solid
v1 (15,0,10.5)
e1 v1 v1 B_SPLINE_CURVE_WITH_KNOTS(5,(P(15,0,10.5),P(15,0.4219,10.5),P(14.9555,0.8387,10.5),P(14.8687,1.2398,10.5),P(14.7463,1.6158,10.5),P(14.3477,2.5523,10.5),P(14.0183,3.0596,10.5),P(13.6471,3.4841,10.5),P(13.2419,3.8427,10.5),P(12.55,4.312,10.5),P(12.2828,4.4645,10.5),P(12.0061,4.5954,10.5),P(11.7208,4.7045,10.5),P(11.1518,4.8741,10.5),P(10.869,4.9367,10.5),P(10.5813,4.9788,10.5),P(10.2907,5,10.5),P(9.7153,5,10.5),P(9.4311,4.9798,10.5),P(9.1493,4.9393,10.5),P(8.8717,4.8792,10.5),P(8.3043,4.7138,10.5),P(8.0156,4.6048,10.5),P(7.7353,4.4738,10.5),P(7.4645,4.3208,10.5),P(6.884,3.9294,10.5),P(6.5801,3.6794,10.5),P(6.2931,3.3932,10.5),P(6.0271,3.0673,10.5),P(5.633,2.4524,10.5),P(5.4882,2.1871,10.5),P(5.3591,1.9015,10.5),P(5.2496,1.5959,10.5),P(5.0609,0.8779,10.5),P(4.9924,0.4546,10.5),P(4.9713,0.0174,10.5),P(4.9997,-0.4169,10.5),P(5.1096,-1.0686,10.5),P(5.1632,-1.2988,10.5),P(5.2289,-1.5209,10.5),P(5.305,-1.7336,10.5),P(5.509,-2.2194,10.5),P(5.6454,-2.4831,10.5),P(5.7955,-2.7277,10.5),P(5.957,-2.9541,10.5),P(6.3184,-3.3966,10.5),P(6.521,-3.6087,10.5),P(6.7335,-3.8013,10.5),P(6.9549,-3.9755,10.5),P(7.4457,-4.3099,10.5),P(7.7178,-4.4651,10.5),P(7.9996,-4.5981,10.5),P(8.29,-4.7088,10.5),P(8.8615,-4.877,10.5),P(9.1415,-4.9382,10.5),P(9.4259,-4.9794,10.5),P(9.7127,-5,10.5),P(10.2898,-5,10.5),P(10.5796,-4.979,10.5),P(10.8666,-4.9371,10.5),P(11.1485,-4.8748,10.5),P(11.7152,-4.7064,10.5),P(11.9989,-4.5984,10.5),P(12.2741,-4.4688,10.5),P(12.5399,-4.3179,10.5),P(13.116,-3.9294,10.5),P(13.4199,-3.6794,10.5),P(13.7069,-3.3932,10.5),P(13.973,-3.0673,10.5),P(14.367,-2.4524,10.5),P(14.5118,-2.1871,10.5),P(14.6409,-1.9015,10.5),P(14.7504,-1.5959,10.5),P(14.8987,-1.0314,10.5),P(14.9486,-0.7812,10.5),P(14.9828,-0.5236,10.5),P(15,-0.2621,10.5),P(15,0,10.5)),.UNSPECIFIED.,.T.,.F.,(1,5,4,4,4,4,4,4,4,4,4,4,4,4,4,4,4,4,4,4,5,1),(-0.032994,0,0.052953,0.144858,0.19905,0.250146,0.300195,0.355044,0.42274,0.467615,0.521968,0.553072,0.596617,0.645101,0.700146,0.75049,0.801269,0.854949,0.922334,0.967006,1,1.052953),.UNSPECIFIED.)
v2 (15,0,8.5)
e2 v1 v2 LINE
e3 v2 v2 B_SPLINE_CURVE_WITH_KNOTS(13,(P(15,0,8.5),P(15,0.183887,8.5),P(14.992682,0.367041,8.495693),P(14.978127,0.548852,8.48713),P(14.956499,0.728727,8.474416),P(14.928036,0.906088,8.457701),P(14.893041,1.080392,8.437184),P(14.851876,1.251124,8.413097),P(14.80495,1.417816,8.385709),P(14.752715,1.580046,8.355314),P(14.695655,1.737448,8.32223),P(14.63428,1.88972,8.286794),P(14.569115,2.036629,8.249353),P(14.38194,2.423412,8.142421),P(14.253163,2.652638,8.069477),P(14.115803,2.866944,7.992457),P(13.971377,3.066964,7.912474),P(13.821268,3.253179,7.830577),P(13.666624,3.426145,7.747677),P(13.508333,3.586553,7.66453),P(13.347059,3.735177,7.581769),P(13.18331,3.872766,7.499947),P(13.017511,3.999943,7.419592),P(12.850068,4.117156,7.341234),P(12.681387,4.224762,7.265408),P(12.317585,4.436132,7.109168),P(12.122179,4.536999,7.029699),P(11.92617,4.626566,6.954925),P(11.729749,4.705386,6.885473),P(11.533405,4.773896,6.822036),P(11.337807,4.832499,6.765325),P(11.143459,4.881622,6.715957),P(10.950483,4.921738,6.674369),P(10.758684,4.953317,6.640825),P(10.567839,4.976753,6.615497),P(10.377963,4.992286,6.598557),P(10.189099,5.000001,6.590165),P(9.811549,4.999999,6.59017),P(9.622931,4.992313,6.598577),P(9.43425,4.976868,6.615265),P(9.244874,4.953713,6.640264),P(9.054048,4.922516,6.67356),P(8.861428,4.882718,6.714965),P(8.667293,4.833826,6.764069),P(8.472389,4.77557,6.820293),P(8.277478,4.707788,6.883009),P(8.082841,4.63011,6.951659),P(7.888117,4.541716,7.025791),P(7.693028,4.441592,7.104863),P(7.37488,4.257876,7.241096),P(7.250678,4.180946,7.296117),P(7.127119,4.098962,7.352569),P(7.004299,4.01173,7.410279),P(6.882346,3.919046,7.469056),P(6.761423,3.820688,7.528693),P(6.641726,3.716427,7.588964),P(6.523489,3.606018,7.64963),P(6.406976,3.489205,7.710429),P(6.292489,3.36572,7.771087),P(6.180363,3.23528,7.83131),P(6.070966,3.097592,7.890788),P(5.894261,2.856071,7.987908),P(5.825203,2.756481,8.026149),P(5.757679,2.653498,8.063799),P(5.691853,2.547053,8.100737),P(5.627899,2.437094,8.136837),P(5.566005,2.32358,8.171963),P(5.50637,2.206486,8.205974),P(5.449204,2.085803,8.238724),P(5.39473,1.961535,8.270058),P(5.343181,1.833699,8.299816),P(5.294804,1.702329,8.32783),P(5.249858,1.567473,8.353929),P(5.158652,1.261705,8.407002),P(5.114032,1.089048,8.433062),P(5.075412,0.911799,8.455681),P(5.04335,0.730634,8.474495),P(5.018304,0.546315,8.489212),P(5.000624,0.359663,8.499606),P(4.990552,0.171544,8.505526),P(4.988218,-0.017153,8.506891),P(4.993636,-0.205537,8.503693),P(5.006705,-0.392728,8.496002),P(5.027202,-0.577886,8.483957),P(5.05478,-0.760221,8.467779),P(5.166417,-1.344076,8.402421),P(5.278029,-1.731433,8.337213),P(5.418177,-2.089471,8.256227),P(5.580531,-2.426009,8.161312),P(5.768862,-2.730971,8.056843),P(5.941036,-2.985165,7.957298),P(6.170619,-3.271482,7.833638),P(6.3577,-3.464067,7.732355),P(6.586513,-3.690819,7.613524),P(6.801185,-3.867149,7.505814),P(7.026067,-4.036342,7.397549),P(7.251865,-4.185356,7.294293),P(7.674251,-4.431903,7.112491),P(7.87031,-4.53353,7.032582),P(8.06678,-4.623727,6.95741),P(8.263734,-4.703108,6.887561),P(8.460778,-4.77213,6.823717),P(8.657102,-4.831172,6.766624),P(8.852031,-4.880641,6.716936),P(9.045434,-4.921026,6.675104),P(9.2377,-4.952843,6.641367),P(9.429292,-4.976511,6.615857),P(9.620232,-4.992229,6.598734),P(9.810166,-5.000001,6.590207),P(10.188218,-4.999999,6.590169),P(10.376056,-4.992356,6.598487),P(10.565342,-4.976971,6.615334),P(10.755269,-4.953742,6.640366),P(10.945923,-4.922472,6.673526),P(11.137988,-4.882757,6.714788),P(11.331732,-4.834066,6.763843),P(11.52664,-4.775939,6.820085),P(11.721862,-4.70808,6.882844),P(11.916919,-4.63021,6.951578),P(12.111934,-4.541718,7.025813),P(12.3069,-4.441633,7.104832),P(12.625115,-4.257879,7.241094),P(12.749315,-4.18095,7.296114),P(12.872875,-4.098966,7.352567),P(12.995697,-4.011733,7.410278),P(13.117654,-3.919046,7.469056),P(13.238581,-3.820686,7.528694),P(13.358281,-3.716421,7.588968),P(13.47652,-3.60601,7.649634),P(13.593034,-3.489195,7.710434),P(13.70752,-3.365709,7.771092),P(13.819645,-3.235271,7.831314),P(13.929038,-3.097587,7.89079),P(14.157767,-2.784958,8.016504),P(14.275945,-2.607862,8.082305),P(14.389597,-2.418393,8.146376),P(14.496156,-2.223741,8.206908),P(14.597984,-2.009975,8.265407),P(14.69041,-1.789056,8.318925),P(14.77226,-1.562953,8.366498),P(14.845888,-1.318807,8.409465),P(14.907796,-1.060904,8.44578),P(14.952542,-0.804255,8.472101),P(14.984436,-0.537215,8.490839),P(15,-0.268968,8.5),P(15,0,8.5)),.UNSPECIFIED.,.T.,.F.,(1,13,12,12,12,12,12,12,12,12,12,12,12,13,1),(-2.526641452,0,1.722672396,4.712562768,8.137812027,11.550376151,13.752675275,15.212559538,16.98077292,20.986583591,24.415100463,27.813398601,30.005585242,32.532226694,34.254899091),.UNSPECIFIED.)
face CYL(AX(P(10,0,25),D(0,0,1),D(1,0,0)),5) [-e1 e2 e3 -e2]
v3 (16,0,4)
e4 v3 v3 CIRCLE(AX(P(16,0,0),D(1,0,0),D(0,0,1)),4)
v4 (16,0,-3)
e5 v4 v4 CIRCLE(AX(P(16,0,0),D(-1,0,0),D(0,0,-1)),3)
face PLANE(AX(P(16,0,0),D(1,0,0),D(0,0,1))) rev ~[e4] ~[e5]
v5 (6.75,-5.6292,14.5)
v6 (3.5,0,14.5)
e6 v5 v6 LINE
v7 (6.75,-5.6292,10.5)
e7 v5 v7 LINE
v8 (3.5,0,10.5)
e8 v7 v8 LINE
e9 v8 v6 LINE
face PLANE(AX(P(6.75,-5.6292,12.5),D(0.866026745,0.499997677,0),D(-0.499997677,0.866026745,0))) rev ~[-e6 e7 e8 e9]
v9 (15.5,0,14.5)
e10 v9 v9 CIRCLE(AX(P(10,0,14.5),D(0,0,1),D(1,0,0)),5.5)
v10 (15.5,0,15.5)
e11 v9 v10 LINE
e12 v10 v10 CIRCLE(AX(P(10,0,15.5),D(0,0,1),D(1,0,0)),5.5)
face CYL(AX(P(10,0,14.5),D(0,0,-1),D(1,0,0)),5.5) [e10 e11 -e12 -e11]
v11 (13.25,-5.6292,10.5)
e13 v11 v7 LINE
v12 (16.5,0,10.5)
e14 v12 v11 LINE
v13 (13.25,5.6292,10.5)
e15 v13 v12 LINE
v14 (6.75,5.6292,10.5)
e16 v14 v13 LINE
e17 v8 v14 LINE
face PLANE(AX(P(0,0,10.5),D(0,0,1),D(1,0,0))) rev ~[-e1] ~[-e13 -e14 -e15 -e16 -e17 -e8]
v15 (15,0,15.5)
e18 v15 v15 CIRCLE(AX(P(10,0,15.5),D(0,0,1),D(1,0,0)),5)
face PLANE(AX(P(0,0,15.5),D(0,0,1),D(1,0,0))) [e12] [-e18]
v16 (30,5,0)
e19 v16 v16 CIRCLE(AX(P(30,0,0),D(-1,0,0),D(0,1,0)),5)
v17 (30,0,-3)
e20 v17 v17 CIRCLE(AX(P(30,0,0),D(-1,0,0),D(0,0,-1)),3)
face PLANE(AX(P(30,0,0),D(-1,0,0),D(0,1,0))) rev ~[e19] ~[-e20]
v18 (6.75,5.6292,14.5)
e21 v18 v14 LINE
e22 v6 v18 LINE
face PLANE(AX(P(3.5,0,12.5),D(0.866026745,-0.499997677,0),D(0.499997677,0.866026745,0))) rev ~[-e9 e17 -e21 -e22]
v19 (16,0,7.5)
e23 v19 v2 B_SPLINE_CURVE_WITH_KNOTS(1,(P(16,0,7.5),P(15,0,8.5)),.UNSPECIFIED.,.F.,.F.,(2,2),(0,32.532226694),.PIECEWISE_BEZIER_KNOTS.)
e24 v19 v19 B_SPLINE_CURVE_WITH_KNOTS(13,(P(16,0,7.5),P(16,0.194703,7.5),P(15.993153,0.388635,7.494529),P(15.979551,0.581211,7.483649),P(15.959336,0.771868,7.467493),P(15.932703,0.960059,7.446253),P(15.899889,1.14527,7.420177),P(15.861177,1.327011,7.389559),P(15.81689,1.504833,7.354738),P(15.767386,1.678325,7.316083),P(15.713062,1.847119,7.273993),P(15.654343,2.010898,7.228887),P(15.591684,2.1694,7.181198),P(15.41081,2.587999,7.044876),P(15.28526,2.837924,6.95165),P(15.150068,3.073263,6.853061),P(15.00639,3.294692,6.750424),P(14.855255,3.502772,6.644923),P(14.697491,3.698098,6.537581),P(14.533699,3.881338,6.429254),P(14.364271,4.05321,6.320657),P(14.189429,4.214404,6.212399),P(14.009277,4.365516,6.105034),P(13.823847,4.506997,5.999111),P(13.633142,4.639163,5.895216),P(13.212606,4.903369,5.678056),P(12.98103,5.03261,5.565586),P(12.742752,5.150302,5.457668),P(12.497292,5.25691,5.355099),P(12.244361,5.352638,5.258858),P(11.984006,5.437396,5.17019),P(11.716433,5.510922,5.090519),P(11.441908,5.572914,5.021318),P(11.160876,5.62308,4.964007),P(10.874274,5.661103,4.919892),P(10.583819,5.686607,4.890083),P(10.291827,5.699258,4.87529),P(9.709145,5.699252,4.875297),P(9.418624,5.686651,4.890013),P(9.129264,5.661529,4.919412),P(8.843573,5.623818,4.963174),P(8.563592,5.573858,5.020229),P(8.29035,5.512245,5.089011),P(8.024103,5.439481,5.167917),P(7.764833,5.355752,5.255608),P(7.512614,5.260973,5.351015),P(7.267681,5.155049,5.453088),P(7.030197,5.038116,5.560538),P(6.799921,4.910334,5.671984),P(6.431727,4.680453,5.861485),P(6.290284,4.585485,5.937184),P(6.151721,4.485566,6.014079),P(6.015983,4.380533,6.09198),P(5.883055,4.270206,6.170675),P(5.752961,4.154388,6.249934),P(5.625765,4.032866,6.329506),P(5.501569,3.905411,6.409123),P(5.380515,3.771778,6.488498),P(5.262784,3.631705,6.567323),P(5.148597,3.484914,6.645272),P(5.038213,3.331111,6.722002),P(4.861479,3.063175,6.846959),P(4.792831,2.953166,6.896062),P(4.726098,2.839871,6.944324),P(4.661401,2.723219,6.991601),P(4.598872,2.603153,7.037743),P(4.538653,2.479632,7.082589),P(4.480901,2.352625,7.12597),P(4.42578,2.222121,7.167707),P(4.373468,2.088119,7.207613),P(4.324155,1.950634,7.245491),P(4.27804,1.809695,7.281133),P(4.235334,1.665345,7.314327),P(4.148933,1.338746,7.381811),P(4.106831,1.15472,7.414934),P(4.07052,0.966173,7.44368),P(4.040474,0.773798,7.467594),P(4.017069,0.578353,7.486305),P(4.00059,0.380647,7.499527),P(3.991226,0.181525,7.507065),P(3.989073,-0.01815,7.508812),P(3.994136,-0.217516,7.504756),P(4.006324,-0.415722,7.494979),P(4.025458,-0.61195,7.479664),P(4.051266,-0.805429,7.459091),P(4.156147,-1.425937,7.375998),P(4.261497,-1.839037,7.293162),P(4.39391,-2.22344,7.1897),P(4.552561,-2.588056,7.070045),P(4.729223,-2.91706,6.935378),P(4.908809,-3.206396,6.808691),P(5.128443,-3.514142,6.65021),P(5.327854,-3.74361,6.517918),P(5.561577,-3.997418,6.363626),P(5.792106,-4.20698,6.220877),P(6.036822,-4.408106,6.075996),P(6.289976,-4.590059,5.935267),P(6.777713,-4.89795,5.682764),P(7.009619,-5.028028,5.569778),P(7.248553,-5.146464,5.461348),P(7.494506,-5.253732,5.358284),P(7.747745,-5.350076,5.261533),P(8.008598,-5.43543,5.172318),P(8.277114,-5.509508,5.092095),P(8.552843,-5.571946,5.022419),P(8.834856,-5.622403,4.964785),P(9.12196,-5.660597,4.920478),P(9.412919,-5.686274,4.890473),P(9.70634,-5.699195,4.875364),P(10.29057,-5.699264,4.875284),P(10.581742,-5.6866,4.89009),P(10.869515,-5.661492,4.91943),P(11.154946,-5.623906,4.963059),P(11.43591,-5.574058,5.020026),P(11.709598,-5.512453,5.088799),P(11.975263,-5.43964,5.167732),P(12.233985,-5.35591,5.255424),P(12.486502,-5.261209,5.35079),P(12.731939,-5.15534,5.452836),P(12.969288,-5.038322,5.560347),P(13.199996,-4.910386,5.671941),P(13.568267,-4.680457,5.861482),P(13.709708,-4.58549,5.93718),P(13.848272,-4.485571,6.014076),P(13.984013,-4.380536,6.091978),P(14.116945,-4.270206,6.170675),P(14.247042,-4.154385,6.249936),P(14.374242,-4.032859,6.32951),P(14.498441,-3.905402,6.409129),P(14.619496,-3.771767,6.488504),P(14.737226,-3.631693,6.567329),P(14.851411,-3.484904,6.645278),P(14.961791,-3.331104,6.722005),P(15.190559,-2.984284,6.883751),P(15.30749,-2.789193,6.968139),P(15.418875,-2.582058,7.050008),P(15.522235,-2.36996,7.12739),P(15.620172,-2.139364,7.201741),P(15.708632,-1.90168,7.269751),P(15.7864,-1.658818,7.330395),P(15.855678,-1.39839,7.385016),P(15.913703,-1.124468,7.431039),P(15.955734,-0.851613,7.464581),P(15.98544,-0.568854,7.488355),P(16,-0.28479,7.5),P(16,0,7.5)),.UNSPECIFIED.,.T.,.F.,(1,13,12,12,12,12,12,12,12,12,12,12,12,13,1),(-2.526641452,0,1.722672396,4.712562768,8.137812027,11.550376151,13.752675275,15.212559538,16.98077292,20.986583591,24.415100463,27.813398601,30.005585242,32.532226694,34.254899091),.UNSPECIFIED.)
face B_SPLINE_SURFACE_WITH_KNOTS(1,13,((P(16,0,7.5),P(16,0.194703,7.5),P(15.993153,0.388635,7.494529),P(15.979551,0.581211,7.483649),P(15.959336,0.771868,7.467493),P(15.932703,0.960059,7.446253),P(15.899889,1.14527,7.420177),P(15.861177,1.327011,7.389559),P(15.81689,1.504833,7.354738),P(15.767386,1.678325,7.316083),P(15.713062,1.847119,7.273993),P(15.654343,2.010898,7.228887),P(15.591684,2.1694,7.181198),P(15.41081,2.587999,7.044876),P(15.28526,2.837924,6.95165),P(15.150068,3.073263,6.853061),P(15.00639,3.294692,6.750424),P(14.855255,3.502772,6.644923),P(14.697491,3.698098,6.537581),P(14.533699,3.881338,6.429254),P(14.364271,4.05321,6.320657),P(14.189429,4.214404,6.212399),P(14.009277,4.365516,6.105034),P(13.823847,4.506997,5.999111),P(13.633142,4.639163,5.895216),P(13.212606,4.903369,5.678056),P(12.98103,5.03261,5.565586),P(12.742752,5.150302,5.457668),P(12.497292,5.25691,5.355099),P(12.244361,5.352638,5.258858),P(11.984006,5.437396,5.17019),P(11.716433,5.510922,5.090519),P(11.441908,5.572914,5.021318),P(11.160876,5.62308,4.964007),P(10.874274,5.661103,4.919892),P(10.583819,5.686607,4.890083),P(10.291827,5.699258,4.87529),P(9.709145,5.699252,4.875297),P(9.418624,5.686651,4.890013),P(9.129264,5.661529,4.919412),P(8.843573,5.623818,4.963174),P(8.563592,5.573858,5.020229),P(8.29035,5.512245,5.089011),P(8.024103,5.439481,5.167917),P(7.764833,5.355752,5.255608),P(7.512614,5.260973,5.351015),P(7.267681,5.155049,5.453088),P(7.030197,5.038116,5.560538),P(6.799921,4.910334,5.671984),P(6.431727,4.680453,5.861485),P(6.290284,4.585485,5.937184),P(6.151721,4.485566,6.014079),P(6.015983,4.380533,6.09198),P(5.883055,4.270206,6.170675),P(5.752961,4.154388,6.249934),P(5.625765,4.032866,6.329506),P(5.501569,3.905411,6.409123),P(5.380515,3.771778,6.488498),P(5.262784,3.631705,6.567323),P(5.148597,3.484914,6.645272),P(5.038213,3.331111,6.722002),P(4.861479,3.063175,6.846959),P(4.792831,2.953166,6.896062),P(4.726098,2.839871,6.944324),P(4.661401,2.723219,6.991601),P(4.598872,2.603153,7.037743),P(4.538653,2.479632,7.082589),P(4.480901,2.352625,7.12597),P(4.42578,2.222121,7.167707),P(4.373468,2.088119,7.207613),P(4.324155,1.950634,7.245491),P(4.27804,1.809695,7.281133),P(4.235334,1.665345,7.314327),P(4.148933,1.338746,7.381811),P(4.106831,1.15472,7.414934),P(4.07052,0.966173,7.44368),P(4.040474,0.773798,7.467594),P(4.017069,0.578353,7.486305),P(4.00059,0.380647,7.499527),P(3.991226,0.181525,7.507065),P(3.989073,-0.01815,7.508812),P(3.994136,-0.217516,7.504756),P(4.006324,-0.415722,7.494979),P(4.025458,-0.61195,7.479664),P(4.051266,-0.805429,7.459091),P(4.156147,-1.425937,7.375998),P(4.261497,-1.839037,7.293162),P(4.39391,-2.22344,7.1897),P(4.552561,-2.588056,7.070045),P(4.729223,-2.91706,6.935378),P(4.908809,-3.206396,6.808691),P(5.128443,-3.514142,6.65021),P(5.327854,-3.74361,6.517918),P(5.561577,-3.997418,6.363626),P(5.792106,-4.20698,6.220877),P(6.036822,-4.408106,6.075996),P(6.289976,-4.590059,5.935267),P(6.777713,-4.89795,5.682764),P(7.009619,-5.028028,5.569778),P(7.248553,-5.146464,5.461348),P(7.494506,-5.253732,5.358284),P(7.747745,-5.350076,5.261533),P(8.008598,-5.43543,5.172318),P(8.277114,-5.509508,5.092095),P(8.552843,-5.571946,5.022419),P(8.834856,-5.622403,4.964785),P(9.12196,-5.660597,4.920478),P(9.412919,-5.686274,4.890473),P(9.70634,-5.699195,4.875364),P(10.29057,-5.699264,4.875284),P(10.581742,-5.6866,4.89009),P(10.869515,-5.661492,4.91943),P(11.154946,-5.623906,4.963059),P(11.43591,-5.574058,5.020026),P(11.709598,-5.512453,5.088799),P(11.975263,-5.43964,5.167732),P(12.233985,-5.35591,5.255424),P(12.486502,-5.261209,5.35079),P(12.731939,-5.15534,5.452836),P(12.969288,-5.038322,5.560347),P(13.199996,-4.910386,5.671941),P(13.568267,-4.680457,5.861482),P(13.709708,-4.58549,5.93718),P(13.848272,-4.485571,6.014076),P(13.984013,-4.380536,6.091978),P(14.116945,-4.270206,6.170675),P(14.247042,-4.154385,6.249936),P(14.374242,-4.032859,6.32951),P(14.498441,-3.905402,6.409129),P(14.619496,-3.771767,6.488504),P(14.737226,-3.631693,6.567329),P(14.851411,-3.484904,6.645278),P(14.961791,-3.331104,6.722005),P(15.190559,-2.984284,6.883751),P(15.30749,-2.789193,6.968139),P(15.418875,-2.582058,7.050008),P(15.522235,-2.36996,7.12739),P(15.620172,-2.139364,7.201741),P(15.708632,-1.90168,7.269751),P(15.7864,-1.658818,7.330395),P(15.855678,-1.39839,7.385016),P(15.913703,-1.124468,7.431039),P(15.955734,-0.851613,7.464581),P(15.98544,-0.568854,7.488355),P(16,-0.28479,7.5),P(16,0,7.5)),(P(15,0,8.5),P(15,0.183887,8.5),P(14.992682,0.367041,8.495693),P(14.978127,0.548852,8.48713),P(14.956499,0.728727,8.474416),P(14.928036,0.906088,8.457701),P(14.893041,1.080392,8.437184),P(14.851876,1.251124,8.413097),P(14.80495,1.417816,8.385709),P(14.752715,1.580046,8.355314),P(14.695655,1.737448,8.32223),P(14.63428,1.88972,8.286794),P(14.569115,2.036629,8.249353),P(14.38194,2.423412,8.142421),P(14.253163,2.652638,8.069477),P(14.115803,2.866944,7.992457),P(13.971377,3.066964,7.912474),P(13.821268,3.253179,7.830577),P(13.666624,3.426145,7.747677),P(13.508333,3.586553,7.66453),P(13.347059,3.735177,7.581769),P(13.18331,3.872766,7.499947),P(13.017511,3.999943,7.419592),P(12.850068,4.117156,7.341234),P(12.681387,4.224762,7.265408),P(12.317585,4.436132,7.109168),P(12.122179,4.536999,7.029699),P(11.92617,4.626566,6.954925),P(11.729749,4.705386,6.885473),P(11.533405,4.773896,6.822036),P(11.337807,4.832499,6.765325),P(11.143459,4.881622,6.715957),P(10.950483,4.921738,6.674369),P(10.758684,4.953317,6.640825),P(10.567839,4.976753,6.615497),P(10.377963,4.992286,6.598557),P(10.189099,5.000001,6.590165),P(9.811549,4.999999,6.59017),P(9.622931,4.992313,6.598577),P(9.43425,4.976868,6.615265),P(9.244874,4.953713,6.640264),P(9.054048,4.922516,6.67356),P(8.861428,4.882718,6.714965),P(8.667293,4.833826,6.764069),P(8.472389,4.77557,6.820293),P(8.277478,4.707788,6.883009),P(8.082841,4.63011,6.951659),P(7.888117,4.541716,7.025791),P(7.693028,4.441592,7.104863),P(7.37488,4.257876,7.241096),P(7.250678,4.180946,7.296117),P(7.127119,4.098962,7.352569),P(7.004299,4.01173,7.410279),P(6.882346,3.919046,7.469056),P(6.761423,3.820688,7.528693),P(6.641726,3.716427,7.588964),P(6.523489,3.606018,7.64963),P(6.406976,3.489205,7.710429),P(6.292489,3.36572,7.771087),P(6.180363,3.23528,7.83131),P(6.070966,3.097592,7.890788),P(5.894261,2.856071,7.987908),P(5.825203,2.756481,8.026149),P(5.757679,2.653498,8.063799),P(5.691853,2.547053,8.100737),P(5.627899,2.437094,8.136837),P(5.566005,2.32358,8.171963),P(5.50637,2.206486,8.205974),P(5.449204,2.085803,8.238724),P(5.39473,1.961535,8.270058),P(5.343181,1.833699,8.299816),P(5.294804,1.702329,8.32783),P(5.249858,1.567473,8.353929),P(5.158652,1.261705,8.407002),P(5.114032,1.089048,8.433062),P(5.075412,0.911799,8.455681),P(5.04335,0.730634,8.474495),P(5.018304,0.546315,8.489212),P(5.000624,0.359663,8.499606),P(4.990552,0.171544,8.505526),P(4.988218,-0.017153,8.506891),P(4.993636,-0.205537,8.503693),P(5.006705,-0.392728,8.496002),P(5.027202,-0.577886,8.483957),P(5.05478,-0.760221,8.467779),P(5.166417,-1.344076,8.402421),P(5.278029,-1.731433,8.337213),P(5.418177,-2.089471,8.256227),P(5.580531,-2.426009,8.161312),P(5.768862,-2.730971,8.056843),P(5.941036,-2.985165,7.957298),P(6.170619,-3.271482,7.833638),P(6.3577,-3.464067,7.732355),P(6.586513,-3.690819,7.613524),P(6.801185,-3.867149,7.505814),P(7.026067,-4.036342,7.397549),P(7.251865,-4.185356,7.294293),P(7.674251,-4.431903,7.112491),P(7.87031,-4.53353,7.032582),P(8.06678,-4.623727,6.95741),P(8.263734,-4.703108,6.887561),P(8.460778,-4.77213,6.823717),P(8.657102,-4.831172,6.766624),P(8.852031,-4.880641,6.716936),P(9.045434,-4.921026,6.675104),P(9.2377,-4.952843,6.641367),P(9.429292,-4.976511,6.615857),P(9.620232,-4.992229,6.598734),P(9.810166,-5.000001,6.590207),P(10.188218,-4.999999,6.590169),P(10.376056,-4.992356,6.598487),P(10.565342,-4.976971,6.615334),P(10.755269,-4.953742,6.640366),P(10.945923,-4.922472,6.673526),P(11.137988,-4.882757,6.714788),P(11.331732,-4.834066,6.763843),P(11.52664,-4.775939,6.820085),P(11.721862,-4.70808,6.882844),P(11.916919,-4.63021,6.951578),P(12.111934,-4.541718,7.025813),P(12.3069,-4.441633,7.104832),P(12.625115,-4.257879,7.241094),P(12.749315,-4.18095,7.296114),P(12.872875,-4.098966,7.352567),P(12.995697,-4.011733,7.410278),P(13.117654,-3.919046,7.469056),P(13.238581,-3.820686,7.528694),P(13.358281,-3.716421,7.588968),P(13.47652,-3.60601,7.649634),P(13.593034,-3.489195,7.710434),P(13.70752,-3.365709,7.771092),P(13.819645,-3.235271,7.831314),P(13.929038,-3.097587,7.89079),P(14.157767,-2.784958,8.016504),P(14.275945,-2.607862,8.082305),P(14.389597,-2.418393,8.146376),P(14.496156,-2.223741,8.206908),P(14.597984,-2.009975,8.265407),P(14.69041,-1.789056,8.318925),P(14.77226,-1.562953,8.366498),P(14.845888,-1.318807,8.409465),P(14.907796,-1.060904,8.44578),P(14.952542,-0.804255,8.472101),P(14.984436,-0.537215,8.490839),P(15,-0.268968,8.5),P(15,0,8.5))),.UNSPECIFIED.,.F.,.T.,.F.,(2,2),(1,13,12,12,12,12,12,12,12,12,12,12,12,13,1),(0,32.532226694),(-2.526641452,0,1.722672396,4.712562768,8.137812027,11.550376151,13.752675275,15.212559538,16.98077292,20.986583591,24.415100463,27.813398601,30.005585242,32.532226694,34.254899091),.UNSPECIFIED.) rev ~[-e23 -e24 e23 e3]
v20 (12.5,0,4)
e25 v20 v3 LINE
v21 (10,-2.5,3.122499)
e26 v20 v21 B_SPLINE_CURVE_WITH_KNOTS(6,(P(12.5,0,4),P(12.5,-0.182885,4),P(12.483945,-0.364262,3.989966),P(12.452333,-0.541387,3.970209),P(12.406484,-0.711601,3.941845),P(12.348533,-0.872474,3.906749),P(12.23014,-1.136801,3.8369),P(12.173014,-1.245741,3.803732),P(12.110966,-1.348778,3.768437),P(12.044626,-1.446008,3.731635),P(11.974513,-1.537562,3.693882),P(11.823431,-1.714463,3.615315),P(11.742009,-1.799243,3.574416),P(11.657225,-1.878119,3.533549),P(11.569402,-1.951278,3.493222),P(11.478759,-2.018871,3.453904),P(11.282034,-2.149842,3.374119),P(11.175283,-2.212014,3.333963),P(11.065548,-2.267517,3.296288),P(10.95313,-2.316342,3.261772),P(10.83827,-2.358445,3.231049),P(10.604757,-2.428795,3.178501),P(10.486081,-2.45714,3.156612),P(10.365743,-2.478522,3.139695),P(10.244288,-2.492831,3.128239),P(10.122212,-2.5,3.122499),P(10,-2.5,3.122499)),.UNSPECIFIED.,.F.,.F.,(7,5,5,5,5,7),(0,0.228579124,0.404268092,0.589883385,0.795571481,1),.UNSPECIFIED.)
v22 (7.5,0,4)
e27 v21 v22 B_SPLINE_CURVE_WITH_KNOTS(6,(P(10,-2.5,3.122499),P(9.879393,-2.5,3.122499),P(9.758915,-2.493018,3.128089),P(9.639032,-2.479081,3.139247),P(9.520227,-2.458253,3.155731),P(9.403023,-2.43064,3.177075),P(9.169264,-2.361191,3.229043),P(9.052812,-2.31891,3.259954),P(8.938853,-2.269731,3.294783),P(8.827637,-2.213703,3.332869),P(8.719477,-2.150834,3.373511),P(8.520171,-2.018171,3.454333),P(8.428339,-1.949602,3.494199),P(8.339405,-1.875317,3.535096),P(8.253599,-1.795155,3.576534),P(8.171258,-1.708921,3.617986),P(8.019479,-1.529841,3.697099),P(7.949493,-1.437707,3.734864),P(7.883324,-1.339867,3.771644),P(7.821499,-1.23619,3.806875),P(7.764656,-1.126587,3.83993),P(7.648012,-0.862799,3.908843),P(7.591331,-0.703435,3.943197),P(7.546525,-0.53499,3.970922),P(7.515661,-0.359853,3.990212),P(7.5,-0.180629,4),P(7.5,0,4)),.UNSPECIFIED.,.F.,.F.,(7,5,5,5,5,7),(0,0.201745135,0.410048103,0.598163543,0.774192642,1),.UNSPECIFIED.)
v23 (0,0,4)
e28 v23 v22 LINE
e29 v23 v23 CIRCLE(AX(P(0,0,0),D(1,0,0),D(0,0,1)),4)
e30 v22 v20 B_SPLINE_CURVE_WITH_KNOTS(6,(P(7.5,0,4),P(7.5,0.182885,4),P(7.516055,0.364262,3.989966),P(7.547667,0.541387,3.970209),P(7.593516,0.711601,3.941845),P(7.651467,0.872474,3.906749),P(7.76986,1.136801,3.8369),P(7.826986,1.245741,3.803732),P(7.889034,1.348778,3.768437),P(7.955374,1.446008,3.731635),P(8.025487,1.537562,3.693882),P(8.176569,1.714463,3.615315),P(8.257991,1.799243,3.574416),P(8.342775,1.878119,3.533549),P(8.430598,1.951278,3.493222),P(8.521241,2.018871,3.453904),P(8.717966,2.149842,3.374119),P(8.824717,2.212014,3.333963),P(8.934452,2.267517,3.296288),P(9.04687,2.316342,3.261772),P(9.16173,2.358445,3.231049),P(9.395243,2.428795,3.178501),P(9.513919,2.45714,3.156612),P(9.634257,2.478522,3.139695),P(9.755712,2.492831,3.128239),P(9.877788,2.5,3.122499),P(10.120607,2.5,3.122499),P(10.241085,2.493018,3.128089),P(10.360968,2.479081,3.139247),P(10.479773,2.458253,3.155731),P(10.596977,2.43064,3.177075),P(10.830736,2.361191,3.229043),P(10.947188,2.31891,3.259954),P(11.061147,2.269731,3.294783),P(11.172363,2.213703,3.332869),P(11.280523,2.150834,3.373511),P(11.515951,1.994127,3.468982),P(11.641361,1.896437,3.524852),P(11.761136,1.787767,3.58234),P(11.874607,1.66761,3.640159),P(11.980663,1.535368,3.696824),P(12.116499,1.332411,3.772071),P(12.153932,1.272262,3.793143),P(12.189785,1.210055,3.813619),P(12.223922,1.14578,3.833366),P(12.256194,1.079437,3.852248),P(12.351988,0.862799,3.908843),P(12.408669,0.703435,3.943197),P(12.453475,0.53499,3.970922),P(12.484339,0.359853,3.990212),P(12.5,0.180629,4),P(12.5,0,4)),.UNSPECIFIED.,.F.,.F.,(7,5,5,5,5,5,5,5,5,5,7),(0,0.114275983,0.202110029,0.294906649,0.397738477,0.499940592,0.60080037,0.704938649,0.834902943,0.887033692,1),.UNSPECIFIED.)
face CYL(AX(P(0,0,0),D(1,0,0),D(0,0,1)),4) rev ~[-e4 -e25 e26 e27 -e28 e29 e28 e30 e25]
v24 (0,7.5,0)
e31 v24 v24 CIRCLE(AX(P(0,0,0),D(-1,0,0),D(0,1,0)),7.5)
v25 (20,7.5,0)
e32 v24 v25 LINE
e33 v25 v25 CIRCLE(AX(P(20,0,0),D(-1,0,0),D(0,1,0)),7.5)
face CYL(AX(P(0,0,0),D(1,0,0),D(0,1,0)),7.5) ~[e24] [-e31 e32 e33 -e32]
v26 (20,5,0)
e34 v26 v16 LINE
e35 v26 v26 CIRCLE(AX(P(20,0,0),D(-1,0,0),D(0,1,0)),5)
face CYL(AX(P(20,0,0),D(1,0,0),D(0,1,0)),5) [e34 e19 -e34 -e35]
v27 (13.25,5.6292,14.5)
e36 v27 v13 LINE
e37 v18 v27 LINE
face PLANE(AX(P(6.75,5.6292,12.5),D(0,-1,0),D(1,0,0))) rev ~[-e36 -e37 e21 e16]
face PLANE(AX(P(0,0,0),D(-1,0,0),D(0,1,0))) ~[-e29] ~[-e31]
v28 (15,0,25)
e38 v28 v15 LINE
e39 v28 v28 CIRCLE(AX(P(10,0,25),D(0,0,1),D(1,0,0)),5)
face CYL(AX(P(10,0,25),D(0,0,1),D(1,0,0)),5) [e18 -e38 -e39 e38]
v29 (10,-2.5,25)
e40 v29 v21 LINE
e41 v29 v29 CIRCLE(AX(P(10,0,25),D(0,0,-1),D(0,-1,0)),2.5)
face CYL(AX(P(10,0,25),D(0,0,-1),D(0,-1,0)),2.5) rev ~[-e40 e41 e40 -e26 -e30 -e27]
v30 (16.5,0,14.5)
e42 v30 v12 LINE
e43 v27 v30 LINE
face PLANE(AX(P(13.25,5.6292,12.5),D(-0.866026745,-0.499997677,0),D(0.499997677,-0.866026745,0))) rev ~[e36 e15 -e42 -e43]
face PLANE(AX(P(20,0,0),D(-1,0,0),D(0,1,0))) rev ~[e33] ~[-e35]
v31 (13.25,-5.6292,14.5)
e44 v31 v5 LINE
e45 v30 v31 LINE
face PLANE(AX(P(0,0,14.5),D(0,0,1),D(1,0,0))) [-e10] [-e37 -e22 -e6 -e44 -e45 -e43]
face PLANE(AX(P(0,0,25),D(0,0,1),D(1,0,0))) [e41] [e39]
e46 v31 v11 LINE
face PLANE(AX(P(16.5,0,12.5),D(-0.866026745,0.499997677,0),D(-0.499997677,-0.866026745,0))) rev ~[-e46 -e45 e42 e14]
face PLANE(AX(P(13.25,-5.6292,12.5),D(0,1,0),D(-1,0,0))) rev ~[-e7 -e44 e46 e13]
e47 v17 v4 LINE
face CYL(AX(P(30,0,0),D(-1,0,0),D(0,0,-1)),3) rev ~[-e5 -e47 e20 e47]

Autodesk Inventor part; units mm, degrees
ref_plane "YZ Plane" through (0, 0, 0) normal (1, 0, 0) x (0, 1, 0)
sketch "Sketch1" plane through (0, 0, 0) normal (0, 0, 1) x (1, 0, 0)
  line L0 (0, 0) -> (0, 7.5)
  line L1 (0, 7.5) -> (20, 7.5)
  line L2 (20, 7.5) -> (20, 5)
  line L3 (20, 5) -> (30, 5)
  line L4 (30, 5) -> (30, 0)
  line L5 (30, 0) -> (0, 0)
  dimension "d0" = 30
  dimension "d1" = 10
  dimension "d2" = 15
  dimension "d3" = 10
revolve "Revolution1" add sketch "Sketch1" angle 360 about axis through (30, 0, 0) along (-1, 0, 0)
ref_plane "Work Plane1" through (0, 0, 25) normal (0, 0, 1) x (1, 0, 0)
sketch "Sketch2" plane through (0, 0, 25) normal (0, 0, 1) x (1, 0, 0)
  circle A0 centre (10, 0) radius 5
  point P0 (0, 0)
  dimension "d6" = 10
  dimension "d7" = 10
extrude "Extrusion1" add sketch "Sketch2" against normal up to surface
ref_plane "Work Plane2" through (0, 0, 12.5) normal (0, 0, 1) x (1, 0, 0)
sketch "Sketch3" plane through (0, 0, 12.5) normal (0, 0, 1) x (1, 0, 0)
  spline S0 degree 5 poles (15, 0) (15, 0.4219) (14.9555, 0.8387) (14.8687, 1.2398) (14.7463, 1.6158) (14.3477, 2.5523) (14.0183, 3.0596) (13.6471, 3.4841) (13.2419, 3.8427) (12.55, 4.312) (12.2828, 4.4645) (12.0061, 4.5954) (11.7208, 4.7045) (11.1518, 4.8741) (10.869, 4.9367) (10.5813, 4.9788) (10.2907, 5) (9.7153, 5) (9.4311, 4.9798) (9.1493, 4.9393) (8.8717, 4.8792) (8.3043, 4.7138) (8.0156, 4.6048) (7.7353, 4.4738) (7.4645, 4.3208) (6.884, 3.9294) (6.5801, 3.6794) (6.2931, 3.3932) (6.0271, 3.0673) (5.633, 2.4524) (5.4882, 2.1871) (5.3591, 1.9015) (5.2496, 1.5959) (5.0609, 0.8779) (4.9924, 0.4546) (4.9713, 0.0174) (4.9997, -0.4169) (5.1096, -1.0686) (5.1632, -1.2988) (5.2289, -1.5209) (5.305, -1.7336) (5.509, -2.2194) (5.6454, -2.4831) (5.7955, -2.7277) (5.957, -2.9541) (6.3184, -3.3966) (6.521, -3.6087) (6.7335, -3.8013) (6.9549, -3.9755) (7.4457, -4.3099) (7.7178, -4.4651) (7.9996, -4.5981) (8.29, -4.7088) (8.8615, -4.877) (9.1415, -4.9382) (9.4259, -4.9794) (9.7127, -5) (10.2898, -5) (10.5796, -4.979) (10.8666, -4.9371) (11.1485, -4.8748) (11.7152, -4.7064) (11.9989, -4.5984) (12.2741, -4.4688) (12.5399, -4.3179) (13.116, -3.9294) (13.4199, -3.6794) (13.7069, -3.3932) (13.973, -3.0673) (14.367, -2.4524) (14.5118, -2.1871) (14.6409, -1.9015) (14.7504, -1.5959) (14.8987, -1.0314) (14.9486, -0.7812) (14.9828, -0.5236) (15, -0.2621) (15, 0) knots 0 0 0 0 0 0 0.052953 0.052953 0.052953 0.052953 0.144858 0.144858 0.144858 0.144858 0.19905 0.19905 0.19905 0.19905 0.250146 0.250146 0.250146 0.250146 0.300195 0.300195 0.300195 0.300195 0.355044 0.355044 0.355044 0.355044 0.42274 0.42274 0.42274 0.42274 0.467615 0.467615 0.467615 0.467615 0.521968 0.521968 0.521968 0.521968 0.553072 0.553072 0.553072 0.553072 0.596617 0.596617 0.596617 0.596617 0.645101 0.645101 0.645101 0.645101 0.700146 0.700146 0.700146 0.700146 0.75049 0.75049 0.75049 0.75049 0.801269 0.801269 0.801269 0.801269 0.854949 0.854949 0.854949 0.854949 0.922334 0.922334 0.922334 0.922334 0.967006 0.967006 0.967006 0.967006 1 1 1 1 1 1 projected
  line L0 (0, 7.5) -> (0, -7.5) projected
  line L1 (20, 7.5) -> (20, -7.5) projected
  line L2 (3.5, 0) -> (6.75, 5.6292)
  line L3 (6.75, 5.6292) -> (13.25, 5.6292)
  line L4 (13.25, 5.6292) -> (16.5, 0)
  line L5 (16.5, 0) -> (13.25, -5.6292)
  line L6 (13.25, -5.6292) -> (6.75, -5.6292)
  line L7 (6.75, -5.6292) -> (3.5, 0)
  point P0 (0, 0)
  point P1 (10, 0)
  dimension "d11" = 13
  dimension "d12" = 10
extrude "Extrusion2" add sketch "Sketch3" along normal mid plane 4
chamfer "Chamfer1" distance 1 angle 45 1 edges at (5.0001, 0.0275, 7.4999)
sketch "Sketch4" plane through (10, 0, 25) normal (0, 0, 1) x (1, 0, 0)
  circle A0 centre (0, 0) radius 5 projected
  point P0 (-10, 0)
hole "Hole1" at (10, 0, 25) direction (0, 0, -1) diameter 5 depth 25
sketch "Sketch5" plane through (0, 0, 0) normal (-1, 0, 0) x (0, 0, 1)
  circle A0 centre (0, 0) radius 7.5 projected
hole "Hole2" at (0, 0, 0) direction (1, 0, 0) diameter 8 depth 16
sketch "Sketch6" plane through (30, 0, 0) normal (1, 0, 0) x (0, 0, -1)
  circle A0 centre (0, 0) radius 5 projected
hole "Hole3" at (30, 0, 0) direction (-1, 0, 0) diameter 6 depth 14
thread "Thread2" size "M8x1.25" class "6H" standard "ISO Metric profile" length 9
sketch "Sketch7" plane through (0, 0, 14.5) normal (0, 0, 1) x (1, 0, 0)
  circle A0 centre (10, 0) radius 2.5 projected
  line L0 (6.75, -5.6292) -> (3.5, 0) projected
  line L1 (3.5, 0) -> (6.75, 5.6292) projected
  line L2 (6.75, 5.6292) -> (13.25, 5.6292) projected
  line L3 (13.25, 5.6292) -> (16.5, 0) projected
  line L4 (16.5, 0) -> (13.25, -5.6292) projected
  line L5 (13.25, -5.6292) -> (6.75, -5.6292) projected
  circle A1 centre (10, 0) radius 5 projected
  circle A2 centre (10, 0) radius 5.5
  point P0 (0, 0)
  dimension "d43" = 11
extrude "Extrusion3" add sketch "Sketch7" along normal blind 1 contours A2
thread "Thread3" size "M10x1.5" class "6g" standard "ISO Metric profile" length 9.5
thread "Thread4" size "M10x1.5" class "6g" standard "ISO Metric profile" length 9.5
properties part number "123"
